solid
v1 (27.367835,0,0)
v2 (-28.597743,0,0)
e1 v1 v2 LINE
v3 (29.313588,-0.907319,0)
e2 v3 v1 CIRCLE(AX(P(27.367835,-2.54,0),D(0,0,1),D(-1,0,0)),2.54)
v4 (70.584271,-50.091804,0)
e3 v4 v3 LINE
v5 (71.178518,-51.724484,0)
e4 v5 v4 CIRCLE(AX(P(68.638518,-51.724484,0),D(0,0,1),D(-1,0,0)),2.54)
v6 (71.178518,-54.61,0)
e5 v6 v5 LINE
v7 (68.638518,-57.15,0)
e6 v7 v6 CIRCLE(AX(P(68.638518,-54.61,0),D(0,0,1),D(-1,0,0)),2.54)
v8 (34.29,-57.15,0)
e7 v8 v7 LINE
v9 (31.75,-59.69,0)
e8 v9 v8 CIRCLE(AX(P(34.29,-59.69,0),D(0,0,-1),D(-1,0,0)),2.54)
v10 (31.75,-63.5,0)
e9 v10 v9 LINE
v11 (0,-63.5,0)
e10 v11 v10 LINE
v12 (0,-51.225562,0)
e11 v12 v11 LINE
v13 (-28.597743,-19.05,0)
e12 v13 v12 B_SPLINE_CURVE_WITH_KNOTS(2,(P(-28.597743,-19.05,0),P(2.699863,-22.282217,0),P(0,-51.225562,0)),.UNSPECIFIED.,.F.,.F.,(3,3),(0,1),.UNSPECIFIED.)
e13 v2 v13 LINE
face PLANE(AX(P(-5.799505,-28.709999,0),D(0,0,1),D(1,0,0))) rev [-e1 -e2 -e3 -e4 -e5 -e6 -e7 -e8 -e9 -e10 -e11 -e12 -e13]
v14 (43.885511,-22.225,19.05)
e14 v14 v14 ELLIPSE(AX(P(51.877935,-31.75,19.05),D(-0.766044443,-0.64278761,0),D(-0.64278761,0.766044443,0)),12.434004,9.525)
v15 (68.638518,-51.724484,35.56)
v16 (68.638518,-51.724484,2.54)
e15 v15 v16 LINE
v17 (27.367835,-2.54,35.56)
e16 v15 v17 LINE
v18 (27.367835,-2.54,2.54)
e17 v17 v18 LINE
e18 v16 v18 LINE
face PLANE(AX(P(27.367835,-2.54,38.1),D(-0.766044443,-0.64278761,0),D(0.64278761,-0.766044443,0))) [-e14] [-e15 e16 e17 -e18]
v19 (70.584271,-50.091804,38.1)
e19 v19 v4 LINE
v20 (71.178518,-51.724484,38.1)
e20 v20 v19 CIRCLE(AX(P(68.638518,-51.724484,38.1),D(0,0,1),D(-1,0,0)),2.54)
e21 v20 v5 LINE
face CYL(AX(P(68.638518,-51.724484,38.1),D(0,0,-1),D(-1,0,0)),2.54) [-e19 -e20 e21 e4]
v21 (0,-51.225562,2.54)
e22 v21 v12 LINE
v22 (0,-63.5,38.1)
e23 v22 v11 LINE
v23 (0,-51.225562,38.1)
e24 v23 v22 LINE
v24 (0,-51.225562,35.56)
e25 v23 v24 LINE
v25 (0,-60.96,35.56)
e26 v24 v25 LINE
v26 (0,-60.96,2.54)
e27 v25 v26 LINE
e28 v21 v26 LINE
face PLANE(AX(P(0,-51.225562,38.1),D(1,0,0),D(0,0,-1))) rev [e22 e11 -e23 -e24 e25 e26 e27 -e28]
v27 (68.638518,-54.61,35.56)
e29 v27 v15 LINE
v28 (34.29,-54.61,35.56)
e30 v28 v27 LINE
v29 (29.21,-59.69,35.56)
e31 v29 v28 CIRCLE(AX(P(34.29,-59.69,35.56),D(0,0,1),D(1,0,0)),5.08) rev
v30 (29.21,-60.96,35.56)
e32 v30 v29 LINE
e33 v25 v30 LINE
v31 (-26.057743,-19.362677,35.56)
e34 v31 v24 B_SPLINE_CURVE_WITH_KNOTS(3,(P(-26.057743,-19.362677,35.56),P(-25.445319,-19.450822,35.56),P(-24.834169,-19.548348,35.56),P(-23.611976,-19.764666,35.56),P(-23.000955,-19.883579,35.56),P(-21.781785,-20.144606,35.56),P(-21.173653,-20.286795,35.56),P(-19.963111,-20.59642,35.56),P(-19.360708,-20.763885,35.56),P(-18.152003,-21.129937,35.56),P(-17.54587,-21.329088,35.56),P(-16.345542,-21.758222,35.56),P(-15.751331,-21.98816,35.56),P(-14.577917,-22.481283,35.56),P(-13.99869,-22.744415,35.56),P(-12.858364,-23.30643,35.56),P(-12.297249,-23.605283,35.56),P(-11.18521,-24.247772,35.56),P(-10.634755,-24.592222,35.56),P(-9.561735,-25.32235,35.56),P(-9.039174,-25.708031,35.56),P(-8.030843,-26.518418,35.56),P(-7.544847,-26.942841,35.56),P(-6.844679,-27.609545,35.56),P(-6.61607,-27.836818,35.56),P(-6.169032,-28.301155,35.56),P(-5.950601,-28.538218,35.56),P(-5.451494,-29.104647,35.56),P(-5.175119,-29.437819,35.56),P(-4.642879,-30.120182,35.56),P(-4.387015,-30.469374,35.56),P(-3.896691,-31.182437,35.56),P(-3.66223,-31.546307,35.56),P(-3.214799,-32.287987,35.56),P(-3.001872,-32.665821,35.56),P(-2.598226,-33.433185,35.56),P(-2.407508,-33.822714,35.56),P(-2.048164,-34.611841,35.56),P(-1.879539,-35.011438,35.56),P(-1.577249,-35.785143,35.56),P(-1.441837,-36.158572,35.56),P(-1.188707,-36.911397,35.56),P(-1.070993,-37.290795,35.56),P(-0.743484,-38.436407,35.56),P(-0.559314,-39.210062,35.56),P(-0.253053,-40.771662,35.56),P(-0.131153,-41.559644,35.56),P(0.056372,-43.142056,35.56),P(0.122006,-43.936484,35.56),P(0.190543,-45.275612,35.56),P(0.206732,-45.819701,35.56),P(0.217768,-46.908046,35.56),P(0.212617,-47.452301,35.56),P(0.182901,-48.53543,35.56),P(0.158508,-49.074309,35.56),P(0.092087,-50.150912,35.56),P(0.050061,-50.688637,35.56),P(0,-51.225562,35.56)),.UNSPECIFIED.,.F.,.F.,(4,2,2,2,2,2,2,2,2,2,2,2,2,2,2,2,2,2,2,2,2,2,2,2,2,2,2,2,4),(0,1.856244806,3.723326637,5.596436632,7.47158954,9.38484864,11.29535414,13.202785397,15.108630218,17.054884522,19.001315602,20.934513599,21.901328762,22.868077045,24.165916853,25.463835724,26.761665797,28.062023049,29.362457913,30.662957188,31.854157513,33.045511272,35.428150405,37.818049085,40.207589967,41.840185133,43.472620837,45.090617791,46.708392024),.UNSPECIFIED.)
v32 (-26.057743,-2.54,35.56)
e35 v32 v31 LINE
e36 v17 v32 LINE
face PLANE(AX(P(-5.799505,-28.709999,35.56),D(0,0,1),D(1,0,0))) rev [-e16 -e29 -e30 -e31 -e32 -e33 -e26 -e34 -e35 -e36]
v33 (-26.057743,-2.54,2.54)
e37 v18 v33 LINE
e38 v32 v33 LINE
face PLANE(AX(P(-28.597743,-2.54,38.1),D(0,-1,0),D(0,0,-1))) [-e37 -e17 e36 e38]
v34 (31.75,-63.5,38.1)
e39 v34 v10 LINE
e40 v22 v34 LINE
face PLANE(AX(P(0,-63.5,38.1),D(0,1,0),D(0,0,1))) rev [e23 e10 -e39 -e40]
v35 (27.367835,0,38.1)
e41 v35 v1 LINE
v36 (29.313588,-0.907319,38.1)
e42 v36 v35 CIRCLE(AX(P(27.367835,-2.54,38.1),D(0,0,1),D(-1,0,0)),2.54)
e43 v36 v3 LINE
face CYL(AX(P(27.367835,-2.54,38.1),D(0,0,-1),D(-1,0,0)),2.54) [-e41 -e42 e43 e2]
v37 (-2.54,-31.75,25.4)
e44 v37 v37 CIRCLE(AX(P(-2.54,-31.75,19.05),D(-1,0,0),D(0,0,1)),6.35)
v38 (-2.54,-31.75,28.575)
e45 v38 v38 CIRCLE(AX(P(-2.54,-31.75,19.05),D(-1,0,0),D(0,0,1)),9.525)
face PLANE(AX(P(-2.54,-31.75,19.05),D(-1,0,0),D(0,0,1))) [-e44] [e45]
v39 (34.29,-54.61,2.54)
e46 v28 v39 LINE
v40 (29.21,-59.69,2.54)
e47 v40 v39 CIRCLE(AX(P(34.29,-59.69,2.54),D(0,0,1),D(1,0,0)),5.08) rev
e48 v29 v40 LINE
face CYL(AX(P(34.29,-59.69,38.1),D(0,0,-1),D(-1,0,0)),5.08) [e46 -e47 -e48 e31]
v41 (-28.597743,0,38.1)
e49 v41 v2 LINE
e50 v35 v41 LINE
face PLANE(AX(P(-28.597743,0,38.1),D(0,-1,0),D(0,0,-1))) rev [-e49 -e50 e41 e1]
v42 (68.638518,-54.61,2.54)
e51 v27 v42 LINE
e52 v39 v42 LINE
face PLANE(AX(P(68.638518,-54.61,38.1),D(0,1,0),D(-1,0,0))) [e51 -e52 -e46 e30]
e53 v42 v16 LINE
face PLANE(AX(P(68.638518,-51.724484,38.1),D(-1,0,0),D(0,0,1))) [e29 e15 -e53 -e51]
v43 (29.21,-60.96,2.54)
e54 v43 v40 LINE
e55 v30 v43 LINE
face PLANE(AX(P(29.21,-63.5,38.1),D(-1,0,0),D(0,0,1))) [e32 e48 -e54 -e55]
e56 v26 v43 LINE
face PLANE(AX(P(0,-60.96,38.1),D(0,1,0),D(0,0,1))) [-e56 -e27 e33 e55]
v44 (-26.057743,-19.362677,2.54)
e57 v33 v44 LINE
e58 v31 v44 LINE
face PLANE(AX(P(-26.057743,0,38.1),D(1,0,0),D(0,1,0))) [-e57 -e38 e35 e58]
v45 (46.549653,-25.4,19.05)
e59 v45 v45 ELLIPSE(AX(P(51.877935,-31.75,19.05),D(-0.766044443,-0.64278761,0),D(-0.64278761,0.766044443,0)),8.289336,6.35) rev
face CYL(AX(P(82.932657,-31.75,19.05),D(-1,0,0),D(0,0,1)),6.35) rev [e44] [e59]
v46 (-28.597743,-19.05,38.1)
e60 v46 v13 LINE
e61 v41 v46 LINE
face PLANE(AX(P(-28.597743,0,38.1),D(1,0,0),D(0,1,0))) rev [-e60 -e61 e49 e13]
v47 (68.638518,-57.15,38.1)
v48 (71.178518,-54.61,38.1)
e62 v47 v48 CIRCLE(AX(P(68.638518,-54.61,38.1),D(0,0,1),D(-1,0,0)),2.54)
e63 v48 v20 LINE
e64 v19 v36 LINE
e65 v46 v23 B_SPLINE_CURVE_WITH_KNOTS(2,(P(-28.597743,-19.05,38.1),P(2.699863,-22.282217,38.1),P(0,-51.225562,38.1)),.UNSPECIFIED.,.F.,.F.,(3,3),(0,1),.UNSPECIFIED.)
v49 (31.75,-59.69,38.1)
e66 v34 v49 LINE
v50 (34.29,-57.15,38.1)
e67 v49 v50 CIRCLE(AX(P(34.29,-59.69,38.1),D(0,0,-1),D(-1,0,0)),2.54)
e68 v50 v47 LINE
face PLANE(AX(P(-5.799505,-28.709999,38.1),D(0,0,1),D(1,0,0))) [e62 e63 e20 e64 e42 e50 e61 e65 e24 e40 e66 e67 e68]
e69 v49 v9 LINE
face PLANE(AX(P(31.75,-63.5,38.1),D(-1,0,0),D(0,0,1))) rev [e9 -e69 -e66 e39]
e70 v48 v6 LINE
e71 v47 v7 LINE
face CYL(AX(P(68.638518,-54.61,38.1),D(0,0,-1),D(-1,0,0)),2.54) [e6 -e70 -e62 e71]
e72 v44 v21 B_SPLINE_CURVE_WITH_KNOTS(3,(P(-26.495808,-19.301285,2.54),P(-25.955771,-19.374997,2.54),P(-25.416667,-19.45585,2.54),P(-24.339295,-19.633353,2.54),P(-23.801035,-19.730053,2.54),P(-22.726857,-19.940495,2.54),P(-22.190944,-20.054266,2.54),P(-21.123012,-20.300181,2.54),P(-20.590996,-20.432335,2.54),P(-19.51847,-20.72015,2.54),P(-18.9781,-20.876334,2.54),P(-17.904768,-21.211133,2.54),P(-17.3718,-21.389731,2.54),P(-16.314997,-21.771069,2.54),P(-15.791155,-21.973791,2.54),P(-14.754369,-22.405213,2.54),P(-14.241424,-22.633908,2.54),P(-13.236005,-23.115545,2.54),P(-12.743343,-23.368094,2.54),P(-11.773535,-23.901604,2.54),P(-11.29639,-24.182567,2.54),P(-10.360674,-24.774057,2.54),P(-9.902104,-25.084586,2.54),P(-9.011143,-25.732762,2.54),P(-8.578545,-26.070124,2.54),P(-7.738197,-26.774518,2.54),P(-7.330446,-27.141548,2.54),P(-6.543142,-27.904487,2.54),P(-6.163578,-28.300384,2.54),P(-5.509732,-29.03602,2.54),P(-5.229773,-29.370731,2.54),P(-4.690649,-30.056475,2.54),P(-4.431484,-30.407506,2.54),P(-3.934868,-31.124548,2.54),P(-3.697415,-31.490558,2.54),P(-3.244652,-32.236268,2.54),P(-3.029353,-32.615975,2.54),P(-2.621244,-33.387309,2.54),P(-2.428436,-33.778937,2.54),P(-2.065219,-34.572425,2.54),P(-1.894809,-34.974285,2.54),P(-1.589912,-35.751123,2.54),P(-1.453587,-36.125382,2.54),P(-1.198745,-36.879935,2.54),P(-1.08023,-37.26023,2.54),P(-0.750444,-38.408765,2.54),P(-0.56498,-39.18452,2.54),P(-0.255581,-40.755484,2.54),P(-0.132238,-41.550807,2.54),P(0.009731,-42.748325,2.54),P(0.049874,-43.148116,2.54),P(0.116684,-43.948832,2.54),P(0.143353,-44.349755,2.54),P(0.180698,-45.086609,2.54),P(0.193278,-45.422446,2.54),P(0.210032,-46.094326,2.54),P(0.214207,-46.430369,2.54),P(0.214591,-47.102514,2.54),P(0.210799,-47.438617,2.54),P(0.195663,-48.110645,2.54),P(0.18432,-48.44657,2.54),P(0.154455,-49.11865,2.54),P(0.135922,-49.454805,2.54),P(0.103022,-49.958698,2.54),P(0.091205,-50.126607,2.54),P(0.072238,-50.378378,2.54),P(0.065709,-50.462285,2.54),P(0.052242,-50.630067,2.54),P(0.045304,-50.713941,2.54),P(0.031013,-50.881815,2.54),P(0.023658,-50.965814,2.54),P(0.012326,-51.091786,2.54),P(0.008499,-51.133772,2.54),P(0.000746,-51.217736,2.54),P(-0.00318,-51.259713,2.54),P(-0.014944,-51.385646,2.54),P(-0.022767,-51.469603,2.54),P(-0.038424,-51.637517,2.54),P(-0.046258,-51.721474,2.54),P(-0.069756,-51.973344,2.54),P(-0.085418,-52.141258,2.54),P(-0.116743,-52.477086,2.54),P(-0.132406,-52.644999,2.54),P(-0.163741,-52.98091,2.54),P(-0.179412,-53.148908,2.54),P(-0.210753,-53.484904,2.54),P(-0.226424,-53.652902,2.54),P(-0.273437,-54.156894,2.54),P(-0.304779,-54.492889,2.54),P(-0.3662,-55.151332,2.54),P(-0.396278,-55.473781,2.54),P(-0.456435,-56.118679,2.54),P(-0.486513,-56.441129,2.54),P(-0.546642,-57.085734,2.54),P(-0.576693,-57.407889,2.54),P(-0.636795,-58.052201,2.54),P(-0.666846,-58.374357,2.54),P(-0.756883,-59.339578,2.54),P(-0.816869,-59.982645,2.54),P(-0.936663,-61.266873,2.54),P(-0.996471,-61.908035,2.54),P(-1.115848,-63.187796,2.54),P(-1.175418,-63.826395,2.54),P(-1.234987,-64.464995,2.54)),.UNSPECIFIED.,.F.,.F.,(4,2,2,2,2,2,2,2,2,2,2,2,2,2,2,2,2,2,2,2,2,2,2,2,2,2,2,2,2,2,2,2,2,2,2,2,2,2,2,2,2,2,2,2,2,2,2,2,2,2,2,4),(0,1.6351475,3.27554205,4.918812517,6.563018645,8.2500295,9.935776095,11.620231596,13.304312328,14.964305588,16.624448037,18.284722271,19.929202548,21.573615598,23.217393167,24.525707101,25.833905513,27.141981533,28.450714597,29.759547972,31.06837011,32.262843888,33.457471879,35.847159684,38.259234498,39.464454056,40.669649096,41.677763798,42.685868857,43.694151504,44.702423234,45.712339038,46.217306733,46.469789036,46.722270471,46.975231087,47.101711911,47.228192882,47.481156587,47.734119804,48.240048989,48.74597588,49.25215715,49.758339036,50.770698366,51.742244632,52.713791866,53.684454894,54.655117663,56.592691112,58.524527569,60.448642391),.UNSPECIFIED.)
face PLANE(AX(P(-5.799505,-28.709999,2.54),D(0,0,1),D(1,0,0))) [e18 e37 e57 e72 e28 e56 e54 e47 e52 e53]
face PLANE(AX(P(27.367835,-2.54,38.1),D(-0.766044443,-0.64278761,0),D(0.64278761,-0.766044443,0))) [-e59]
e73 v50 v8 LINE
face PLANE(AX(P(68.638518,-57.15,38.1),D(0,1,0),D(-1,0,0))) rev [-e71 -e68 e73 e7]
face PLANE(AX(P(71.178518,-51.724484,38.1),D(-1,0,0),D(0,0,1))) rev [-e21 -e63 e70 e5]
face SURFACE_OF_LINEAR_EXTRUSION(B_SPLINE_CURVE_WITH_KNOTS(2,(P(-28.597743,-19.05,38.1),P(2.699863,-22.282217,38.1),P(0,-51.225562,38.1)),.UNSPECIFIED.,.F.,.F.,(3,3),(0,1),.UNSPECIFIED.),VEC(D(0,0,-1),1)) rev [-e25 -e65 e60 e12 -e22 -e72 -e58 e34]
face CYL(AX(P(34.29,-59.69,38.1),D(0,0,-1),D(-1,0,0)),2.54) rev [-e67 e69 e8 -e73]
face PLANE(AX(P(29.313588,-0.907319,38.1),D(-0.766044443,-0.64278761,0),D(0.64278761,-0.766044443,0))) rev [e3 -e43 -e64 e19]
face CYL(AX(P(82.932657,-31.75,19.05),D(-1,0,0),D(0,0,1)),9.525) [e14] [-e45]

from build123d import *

# Parameters (mm, degrees)
BOSS_EXTRUDE1_DEPTH             = 38.1
SHELL1_START                    = 2.54
SHELL1_DEPTH                    = 33.02
SKETCH2_R                       = 9.525
SKETCH2_R_2                     = 6.35
BOSS_EXTRUDE2_DEPTH             = 35.56
BOSS_EXTRUDE2_DIRECTION_2_REACH = 98.336


# Read off the part's stored shape, not the designer's step: Shell1
with BuildPart() as part:
    # Sketch1 → Boss-Extrude1 (new body)
    with BuildSketch(Plane.XY):
        with BuildLine():
            Line((-28.597743471, 0), (27.367835077, 0))
            ThreePointArc((27.367835077, 0), (28.441285462, -0.237978221), (29.313587963, -0.907319471))
            Line((29.313587963, -0.907319471), (70.584270678, -50.091803866))
            ThreePointArc((70.584270678, -50.091803866), (71.025337049, -50.855753231), (71.178517793, -51.724484395))
            Line((71.178517793, -51.724484395), (71.178517793, -54.61))
            ThreePointArc((71.178517793, -54.61), (70.434569017, -56.406051224), (68.638517793, -57.15))
            Line((68.638517793, -57.15), (34.29, -57.15))
            ThreePointArc((34.29, -57.15), (32.493948776, -57.893948776), (31.75, -59.69))
            Line((31.75, -59.69), (31.75, -63.5))
            Line((31.75, -63.5), (0, -63.5))
            Line((0, -63.5), (0, -51.225562477))
            add(Edge.make_bspline(
                [(-28.597743471, -19.05), (2.699862554, -22.282217033), (0, -51.225562477)],
                knots=[0, 0, 0, 1, 1, 1], degree=2))
            Line((-28.597743471, -19.05), (-28.597743471, 0))
        make_face()
    extrude(amount=BOSS_EXTRUDE1_DEPTH)

    # Shell1 outline → Shell1 (cut)
    with BuildSketch(Plane.XY.offset(SHELL1_START)):
        with BuildLine():
            Line((-26.057743471, -2.54), (-26.057743471, -19.362677405))
            add(Edge.make_bspline(
                [(-26.057743471, -19.362677405), (2.587779826, -23.483777864), (0, -51.225562477)],
                knots=[0.041514235, 0.041514235, 0.041514235, 1, 1, 1], degree=2))
            Line((0, -51.225562477), (0, -60.96))
            Line((0, -60.96), (29.21, -60.96))
            Line((29.21, -60.96), (29.21, -59.69))
            ThreePointArc((29.21, -59.69), (30.697897552, -56.097897552), (34.29, -54.61))
            Line((34.29, -54.61), (68.638517793, -54.61))
            Line((68.638517793, -54.61), (68.638517793, -51.724484395))
            Line((68.638517793, -51.724484395), (27.367835077, -2.54))
            Line((27.367835077, -2.54), (-26.057743471, -2.54))
        make_face()
    extrude(amount=SHELL1_DEPTH, mode=Mode.SUBTRACT)

    # Sketch2 → Boss-Extrude2 (add)
    with BuildSketch(Plane.ZY.offset(-33.02)):
        with Locations((19.05, -31.75)):
            Circle(SKETCH2_R)
        with Locations((19.05, -31.75)):
            Circle(SKETCH2_R_2, mode=Mode.SUBTRACT)
    extrude(amount=BOSS_EXTRUDE2_DEPTH)

    # Boss-Extrude2 direction 2: up to this face of the body (flat: up to its plane)
    boss_extrude2_direction_2_end = Plane(part.part.faces().sort_by_distance((48.003176435, -27.132242197, 19.05))[0])
    # Sketch2 → Boss-Extrude2 direction 2 (add, up to the picked face)
    with BuildSketch(Plane.ZY.offset(-33.02), mode=Mode.PRIVATE) as boss_extrude2_direction_2_sk1:
        with Locations((19.05, -31.75)):
            Circle(SKETCH2_R)
        with Locations((19.05, -31.75)):
            Circle(SKETCH2_R_2, mode=Mode.SUBTRACT)
    boss_extrude2_direction_2_tool1 = split(extrude(boss_extrude2_direction_2_sk1.sketch, amount=-BOSS_EXTRUDE2_DIRECTION_2_REACH, mode=Mode.PRIVATE), bisect_by=boss_extrude2_direction_2_end, keep=Keep.BOTH, mode=Mode.PRIVATE)
    add(boss_extrude2_direction_2_tool1.solids().sort_by(Axis((33.02, -31.75, 9.794408), (1, 0, 0)))[0])


solid = part.part
